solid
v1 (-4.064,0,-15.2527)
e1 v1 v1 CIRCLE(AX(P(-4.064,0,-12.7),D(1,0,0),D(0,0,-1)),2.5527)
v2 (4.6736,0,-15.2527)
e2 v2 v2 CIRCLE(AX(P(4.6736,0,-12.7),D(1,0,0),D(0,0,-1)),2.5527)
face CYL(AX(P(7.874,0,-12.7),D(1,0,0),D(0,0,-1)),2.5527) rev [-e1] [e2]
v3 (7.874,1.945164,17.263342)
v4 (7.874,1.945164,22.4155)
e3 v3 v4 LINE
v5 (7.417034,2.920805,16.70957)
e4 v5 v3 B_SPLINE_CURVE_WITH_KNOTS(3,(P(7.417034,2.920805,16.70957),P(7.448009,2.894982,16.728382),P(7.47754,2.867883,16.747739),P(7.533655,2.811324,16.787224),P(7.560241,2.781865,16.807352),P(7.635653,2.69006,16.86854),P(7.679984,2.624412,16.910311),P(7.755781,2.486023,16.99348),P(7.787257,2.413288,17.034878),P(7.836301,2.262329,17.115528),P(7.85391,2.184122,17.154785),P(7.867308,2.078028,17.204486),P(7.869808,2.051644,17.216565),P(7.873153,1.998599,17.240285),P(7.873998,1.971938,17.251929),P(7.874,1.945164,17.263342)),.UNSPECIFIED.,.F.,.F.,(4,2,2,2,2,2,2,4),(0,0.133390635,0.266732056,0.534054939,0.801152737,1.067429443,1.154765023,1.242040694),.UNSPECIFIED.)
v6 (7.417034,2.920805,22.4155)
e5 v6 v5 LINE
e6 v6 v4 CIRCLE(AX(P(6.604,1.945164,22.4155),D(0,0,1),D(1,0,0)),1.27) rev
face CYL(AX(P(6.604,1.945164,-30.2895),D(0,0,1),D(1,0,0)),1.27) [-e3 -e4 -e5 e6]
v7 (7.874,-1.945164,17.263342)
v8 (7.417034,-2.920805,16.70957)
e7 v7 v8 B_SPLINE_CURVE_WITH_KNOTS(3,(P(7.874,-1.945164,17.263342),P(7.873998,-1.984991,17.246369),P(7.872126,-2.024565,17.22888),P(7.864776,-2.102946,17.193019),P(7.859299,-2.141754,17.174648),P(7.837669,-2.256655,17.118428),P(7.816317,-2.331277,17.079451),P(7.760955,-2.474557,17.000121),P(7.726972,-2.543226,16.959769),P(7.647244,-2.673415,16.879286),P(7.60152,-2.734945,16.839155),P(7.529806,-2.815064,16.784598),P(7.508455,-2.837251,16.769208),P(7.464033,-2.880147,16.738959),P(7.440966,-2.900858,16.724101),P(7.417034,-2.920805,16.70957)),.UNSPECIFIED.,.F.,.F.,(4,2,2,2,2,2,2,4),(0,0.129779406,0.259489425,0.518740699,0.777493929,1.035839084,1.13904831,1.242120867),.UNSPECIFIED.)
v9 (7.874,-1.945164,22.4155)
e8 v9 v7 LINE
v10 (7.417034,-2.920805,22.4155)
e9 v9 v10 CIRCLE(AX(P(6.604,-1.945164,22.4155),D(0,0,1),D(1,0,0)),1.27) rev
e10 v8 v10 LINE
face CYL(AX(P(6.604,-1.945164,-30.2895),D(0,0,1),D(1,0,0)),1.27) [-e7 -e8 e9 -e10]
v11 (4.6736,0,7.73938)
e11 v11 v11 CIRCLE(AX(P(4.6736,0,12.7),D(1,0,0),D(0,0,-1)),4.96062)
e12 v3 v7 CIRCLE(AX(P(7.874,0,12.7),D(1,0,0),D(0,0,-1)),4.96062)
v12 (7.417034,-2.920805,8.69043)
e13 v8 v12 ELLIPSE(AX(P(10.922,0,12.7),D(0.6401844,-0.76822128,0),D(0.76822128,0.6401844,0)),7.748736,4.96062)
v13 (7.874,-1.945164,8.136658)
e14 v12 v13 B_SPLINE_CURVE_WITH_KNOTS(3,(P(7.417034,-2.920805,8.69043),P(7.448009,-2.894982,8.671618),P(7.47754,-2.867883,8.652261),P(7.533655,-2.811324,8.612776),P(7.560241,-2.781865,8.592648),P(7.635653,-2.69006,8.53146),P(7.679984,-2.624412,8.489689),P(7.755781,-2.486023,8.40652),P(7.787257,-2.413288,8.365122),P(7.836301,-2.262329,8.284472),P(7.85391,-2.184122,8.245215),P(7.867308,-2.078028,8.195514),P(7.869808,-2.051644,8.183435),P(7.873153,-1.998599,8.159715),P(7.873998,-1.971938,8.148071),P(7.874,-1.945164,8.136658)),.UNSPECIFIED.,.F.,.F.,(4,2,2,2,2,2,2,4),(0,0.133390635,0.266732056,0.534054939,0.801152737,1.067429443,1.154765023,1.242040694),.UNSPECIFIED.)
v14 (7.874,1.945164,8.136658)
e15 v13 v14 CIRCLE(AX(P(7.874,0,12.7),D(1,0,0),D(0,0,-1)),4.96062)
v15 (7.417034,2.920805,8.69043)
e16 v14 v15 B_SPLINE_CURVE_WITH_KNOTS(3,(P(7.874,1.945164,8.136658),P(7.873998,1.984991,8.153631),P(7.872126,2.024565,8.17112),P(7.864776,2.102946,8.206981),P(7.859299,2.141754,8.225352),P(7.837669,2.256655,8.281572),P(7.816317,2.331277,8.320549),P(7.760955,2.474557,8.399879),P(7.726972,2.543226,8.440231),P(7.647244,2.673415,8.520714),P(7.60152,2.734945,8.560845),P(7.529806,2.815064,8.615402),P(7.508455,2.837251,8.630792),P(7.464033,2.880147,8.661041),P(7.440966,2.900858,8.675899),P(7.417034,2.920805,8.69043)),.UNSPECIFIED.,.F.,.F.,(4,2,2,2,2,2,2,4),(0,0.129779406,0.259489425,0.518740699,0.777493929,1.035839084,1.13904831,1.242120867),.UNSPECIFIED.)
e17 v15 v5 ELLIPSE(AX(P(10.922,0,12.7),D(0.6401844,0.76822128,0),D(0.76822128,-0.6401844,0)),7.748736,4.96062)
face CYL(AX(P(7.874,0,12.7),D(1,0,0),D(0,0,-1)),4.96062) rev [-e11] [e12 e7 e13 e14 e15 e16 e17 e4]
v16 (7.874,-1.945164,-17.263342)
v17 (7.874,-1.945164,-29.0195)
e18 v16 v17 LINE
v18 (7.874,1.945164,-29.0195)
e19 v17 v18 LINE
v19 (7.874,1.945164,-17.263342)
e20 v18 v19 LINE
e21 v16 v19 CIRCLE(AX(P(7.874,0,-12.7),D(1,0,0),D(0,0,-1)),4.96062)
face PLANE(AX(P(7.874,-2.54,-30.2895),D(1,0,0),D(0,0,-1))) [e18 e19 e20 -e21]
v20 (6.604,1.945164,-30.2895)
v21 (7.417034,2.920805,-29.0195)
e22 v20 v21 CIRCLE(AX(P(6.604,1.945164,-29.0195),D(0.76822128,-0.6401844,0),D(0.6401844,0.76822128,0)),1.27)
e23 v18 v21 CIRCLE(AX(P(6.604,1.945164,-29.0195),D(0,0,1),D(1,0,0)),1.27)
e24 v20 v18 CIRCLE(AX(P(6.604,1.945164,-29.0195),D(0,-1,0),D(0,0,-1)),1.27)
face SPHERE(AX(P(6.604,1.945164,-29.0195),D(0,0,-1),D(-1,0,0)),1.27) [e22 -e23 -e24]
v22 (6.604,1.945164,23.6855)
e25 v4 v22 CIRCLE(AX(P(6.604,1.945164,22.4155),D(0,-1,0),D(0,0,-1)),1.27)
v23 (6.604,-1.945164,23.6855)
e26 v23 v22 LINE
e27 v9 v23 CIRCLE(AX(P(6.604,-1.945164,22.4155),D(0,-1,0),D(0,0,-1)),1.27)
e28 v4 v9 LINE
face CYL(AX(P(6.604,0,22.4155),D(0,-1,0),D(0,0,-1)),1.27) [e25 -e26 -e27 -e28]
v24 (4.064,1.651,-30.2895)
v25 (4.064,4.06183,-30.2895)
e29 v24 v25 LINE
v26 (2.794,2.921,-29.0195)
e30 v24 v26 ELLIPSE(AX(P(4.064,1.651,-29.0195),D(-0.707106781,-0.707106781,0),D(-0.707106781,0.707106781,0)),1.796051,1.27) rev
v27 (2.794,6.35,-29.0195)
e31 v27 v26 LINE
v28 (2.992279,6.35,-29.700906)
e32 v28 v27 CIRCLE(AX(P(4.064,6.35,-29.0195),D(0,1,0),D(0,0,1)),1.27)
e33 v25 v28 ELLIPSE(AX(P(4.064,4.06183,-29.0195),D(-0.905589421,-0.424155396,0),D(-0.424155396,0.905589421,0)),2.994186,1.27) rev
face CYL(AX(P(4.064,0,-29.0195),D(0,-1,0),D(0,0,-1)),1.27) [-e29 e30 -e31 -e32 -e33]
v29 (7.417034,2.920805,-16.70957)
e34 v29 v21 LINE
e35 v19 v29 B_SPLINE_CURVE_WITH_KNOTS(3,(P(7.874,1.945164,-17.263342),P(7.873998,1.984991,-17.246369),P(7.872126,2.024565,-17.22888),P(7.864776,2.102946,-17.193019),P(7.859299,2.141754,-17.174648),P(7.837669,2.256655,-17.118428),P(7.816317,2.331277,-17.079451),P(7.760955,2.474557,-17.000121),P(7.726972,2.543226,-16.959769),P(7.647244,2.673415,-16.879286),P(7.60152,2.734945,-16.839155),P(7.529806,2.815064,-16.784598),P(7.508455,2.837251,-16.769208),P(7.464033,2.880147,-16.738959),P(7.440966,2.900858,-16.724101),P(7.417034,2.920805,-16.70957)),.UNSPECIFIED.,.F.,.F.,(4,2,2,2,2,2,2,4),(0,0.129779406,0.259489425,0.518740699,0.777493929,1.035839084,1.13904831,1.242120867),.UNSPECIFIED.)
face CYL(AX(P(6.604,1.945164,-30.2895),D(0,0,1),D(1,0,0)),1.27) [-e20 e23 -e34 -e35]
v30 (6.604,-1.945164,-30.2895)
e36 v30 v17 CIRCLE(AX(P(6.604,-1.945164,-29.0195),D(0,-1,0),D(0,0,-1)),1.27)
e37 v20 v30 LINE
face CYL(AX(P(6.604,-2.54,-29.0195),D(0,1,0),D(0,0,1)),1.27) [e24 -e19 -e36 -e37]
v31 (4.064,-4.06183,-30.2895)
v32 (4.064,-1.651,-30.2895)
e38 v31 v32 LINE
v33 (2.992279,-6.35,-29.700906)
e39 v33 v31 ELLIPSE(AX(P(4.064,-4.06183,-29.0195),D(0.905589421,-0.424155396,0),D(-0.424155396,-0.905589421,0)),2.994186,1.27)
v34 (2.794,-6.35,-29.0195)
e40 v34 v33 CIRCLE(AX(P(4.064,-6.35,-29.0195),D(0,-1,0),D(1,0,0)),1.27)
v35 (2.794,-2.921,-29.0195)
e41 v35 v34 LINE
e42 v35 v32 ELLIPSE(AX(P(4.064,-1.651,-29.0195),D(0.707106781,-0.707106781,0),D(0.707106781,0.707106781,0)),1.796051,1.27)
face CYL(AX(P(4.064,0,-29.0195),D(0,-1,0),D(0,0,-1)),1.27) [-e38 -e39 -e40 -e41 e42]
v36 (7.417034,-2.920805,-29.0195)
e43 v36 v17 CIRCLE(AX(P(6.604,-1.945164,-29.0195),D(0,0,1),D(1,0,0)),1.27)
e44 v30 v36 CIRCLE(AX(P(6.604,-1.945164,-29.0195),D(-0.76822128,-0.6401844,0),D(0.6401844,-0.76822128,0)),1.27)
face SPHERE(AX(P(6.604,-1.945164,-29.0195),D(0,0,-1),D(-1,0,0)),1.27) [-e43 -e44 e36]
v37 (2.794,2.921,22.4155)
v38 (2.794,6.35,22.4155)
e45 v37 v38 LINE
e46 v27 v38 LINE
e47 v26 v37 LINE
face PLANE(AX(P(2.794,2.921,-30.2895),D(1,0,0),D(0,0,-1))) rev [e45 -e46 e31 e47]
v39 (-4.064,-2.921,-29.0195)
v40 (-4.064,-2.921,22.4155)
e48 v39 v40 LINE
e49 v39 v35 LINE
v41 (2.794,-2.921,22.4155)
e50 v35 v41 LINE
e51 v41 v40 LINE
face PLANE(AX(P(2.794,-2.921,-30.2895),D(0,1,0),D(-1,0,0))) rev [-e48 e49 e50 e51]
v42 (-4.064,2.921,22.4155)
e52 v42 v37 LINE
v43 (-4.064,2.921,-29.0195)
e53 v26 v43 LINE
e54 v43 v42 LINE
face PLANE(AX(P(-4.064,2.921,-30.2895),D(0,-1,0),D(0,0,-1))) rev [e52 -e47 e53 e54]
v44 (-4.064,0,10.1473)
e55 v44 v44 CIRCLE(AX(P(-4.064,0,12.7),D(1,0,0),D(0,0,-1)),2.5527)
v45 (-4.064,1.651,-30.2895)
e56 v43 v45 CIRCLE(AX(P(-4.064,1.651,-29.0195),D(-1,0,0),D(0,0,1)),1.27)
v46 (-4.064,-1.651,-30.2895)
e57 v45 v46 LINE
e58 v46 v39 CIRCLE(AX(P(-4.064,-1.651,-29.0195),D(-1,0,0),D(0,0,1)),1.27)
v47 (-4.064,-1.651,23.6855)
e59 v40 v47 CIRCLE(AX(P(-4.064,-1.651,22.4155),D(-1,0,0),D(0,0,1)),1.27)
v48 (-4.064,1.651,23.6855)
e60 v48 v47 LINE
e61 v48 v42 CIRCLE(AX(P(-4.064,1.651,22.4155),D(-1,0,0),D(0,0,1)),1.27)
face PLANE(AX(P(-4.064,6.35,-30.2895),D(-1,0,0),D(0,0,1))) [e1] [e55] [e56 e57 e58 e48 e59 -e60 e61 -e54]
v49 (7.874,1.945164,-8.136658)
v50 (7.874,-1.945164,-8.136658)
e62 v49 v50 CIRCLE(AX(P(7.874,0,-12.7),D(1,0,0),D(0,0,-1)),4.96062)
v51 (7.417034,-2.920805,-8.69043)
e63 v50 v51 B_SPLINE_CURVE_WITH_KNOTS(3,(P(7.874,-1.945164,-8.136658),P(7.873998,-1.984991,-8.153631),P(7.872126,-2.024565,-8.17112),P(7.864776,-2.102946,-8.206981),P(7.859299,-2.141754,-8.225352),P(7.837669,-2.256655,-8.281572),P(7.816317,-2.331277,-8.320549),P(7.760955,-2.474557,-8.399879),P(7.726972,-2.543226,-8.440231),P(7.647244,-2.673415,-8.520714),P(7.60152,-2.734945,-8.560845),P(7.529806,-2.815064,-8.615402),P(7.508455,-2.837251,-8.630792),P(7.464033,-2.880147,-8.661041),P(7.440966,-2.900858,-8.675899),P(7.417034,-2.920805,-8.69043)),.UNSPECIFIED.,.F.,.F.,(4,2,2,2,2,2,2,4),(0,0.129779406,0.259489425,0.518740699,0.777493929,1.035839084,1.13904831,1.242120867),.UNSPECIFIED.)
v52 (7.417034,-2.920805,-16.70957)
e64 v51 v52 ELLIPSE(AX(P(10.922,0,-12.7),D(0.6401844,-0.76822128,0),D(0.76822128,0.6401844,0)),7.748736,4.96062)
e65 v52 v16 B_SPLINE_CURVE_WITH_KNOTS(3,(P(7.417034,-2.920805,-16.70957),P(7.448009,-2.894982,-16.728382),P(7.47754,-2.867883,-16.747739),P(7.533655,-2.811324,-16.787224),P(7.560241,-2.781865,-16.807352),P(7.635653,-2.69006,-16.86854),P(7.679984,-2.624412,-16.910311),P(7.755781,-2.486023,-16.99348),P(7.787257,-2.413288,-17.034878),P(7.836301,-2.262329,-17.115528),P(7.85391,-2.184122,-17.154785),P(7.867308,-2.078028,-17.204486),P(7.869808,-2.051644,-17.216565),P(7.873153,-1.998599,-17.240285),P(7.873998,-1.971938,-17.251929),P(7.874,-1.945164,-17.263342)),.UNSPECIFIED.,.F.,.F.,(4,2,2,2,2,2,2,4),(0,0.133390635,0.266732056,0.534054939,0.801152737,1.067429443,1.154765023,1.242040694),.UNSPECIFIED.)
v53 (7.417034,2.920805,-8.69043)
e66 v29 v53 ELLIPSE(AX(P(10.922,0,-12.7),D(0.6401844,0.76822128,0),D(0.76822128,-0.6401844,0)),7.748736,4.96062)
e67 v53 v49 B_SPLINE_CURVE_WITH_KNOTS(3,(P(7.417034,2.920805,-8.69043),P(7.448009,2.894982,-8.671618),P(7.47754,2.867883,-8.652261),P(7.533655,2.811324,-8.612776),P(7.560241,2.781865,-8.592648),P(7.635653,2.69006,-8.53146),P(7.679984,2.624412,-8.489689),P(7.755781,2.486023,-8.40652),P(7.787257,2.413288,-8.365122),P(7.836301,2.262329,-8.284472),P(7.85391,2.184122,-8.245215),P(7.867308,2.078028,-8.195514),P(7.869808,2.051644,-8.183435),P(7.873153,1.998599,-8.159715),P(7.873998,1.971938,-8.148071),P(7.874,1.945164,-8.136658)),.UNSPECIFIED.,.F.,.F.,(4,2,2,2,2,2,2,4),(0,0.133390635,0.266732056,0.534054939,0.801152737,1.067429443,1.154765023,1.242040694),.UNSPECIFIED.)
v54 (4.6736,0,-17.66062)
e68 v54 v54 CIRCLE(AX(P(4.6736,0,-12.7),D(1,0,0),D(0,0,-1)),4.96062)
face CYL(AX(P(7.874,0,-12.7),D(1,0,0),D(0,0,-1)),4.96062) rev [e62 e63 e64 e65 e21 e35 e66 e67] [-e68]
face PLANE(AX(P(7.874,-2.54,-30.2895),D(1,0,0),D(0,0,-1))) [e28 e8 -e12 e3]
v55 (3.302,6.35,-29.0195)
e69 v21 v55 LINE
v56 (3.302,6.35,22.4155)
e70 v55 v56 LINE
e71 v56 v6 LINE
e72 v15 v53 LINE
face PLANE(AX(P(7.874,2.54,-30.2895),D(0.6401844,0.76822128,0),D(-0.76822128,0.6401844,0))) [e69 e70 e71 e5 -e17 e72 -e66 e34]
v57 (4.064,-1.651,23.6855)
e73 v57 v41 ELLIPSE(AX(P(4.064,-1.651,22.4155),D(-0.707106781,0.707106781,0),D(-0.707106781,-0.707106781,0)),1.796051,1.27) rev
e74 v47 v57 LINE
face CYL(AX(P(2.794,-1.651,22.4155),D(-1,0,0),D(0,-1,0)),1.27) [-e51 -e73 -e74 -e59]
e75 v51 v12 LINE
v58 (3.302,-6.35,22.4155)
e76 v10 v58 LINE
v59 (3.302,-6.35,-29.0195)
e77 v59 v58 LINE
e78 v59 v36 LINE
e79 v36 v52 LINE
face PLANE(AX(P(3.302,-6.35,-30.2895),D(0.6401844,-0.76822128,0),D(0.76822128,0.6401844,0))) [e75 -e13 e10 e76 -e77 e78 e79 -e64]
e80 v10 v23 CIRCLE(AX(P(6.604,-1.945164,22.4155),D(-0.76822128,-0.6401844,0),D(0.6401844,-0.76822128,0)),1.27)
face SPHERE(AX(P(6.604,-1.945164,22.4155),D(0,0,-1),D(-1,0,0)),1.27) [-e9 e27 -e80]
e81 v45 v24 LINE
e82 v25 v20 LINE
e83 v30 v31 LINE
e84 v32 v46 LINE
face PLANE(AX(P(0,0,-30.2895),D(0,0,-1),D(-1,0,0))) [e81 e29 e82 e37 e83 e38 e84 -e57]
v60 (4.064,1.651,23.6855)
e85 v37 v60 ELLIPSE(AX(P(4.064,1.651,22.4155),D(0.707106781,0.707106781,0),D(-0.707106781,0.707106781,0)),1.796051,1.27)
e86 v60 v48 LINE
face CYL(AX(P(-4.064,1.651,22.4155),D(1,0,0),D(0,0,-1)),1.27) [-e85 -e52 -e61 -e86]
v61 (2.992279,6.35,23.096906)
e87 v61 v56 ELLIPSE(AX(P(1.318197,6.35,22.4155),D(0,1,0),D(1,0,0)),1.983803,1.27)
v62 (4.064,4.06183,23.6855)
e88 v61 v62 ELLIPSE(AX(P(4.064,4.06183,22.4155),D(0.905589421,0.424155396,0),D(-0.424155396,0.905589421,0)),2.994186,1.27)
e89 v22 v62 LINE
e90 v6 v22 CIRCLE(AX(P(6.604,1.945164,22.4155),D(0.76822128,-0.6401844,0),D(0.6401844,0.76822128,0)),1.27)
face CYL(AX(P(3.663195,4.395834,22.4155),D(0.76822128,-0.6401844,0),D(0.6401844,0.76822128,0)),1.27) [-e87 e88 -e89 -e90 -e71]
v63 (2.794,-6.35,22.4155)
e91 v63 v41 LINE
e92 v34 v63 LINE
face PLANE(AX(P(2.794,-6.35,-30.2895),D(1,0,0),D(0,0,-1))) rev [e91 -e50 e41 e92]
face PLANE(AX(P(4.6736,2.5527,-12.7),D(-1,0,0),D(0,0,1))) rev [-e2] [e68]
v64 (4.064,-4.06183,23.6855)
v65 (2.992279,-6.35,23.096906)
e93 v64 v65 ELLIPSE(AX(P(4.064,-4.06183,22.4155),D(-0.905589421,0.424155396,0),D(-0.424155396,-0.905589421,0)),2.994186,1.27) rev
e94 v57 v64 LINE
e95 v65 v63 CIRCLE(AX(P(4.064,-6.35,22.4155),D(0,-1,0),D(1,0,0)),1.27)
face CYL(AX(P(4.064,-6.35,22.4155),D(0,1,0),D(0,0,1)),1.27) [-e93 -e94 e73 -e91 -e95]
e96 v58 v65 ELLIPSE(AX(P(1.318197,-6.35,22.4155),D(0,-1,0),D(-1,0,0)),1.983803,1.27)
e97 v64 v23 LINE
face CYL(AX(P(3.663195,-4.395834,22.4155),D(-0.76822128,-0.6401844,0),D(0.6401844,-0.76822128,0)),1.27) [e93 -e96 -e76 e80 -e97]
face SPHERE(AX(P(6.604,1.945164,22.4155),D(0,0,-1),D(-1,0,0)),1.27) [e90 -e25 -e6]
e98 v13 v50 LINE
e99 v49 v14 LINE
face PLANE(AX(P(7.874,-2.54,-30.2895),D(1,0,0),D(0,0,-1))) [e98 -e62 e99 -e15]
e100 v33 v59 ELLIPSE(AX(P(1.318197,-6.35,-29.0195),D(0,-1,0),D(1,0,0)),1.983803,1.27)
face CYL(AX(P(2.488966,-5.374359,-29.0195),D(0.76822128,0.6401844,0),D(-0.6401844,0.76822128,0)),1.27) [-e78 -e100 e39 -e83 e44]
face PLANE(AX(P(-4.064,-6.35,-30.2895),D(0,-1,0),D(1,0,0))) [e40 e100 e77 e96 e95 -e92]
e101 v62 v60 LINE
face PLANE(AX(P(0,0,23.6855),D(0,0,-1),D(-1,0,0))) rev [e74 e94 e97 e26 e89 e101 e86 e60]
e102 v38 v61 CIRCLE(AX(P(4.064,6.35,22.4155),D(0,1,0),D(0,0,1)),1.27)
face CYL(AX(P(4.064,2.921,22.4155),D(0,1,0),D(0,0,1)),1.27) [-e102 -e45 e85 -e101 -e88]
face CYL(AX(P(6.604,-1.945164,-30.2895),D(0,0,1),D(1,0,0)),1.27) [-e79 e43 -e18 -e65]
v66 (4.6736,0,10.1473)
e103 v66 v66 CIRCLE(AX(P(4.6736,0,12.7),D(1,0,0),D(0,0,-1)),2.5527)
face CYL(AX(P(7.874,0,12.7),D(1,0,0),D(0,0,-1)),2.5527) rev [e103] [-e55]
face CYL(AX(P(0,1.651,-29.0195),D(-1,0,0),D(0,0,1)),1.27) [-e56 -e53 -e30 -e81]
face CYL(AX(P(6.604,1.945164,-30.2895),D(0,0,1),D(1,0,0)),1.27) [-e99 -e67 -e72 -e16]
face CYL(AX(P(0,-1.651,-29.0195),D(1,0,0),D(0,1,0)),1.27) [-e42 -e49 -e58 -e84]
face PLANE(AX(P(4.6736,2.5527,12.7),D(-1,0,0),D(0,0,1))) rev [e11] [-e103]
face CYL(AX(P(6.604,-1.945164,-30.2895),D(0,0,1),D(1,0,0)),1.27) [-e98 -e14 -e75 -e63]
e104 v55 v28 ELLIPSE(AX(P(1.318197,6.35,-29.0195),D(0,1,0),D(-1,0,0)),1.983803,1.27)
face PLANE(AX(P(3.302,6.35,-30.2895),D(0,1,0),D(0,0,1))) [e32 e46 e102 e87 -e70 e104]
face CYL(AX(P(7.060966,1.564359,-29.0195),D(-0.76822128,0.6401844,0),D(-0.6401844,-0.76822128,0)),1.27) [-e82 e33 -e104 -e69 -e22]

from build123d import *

# Parameters (mm, degrees)
BOSS_EXTRUDE1_DEPTH                             = 53.975
SKETCH2_W                                       = 6.858
SKETCH2_H                                       = 3.429
CUT_EXTRUDE1_DEPTH                              = 55.91468839
SKETCH4_W                                       = 6.858
SKETCH4_H                                       = 3.429
CUT_EXTRUDE2_DEPTH                              = 55.91468839
F_3_CLEARANCE_HOLE1_D                           = 2.7686
CBORE_FOR_10_BUTTON_HEAD_CAP_SCREW1_D           = 5.1054
CBORE_FOR_10_BUTTON_HEAD_CAP_SCREW1_CBORE_D     = 9.92124
CBORE_FOR_10_BUTTON_HEAD_CAP_SCREW1_CBORE_DEPTH = 3.2004
FILLET1_R                                       = 1.27
FILLET3_R                                       = 1.27
FILLET5_R                                       = 1.27


with BuildPart() as part:
    # Sketch1 → Boss-Extrude1 (new body)
    with BuildSketch(Plane.XY.offset(23.6855)):
        Polygon((3.302, 6.35), (-4.064, 6.35), (-4.064, -6.35), (3.302, -6.35), (7.874, -2.54), (7.874, 2.54), align=None)
    extrude(amount=-BOSS_EXTRUDE1_DEPTH)

    # Sketch2 → Cut-Extrude1 (cut, through all)
    with BuildSketch(Plane.XY.offset(23.6855)):
        with Locations((-0.635, 4.6355)):
            Rectangle(SKETCH2_W, SKETCH2_H)
    extrude(amount=-CUT_EXTRUDE1_DEPTH, mode=Mode.SUBTRACT)

    # Sketch4 → Cut-Extrude2 (cut, through all)
    with BuildSketch(Plane.XY.offset(23.6855)):
        with Locations((-0.635, -4.6355)):
            Rectangle(SKETCH4_W, SKETCH4_H)
    extrude(amount=-CUT_EXTRUDE2_DEPTH, mode=Mode.SUBTRACT)

    # #3 Clearance Hole1 (through all)
    with Locations(Plane.ZY.offset(4.064)):
        with Locations((12.7, 0), (-12.7, 0)):
            Hole(F_3_CLEARANCE_HOLE1_D / 2)

    # CBORE for #10 Button Head Cap Screw1 (through all)
    with Locations(Plane(origin=(7.874, 0, 0), x_dir=(0, 0, -1), z_dir=(1, 0, 0))):
        with Locations((-12.7, 0), (12.7, 0)):
            CounterBoreHole(CBORE_FOR_10_BUTTON_HEAD_CAP_SCREW1_D / 2, CBORE_FOR_10_BUTTON_HEAD_CAP_SCREW1_CBORE_D / 2, CBORE_FOR_10_BUTTON_HEAD_CAP_SCREW1_CBORE_DEPTH)

    # Fillet1
    fillet1_edges = [part.edges().sort_by_distance(p)[0] for p in [
        (7.874, -2.54, 20.323251747),
        (7.874, -2.54, -23.625251747),
        (7.874, -2.54, 0),
        (7.874, 2.54, 20.323251747),
        (7.874, 2.54, 0),
        (7.874, 2.54, -23.625251747),
    ]]
    fillet(fillet1_edges, radius=FILLET1_R)

    # Fillet3
    # the kernel refuses this fillet: 1.27 mm, written as the material it takes off along each edge
    with BuildSketch(Plane(origin=(0.862897437, -8.382585469, -30.2895), x_dir=(0, 0, 1), z_dir=(0.7682212795973759, 0.6401843996644799, 0)), Plane(origin=(7.417034188, 2.920804844, -30.2895), x_dir=(0, 0, 1), z_dir=(-0.7682212795973759, 0.6401843996644799, 0))) as fillet3_piece_1:
        with BuildLine():
            CenterArc((FILLET3_R, -FILLET3_R), FILLET3_R, 90, 90)
            Line((0, -FILLET3_R), (0, 0))
            Line((0, 0), (FILLET3_R, 0))
        make_face()
    extrude(amount=8.531574072, mode=Mode.SUBTRACT)
    with BuildSketch(Plane(origin=(6.604, -1.945163819, -30.2895), x_dir=(0.6401843996644796, -0.7682212795973762, 0), z_dir=(-0.7682212795973762, -0.6401843996644796, 0))) as fillet3_piece_2:
        with BuildLine():
            CenterArc((1.27 - FILLET3_R, FILLET3_R), FILLET3_R, 270, 90)
            Line((1.27, FILLET3_R), (1.27, 0))
            Line((1.27, 0), (1.27 - FILLET3_R, 0))
        make_face()
    revolve(axis=Axis((6.604, -1.945163819, -30.2895), (0, 0, 1)), revolution_arc=50.194428908, mode=Mode.SUBTRACT)
    with BuildSketch(Plane(origin=(6.604, 1.945163819, -30.2895), x_dir=(0.6401843996644799, 0.7682212795973757, 0), z_dir=(-0.7682212795973757, 0.6401843996644799, 0))) as fillet3_piece_3:
        with BuildLine():
            CenterArc((1.27 - FILLET3_R, -FILLET3_R), FILLET3_R, 0, 90)
            Line((1.27, -FILLET3_R), (1.27, 0))
            Line((1.27, 0), (1.27 - FILLET3_R, 0))
        make_face()
    revolve(axis=Axis((6.604, 1.945163819, -30.2895), (0, 0, -1)), revolution_arc=50.194428908, mode=Mode.SUBTRACT)
    with BuildSketch(Plane(origin=(2.794, -2.921, -30.2895), x_dir=(0, 0, 1), z_dir=(-1, 0, 0)), Plane(origin=(-7.239, 2.921, -30.2895), x_dir=(0, 0, 1), z_dir=(1, 0, 0))) as fillet3_piece_4:
        with BuildLine():
            CenterArc((FILLET3_R, FILLET3_R), FILLET3_R, 180, 90)
            Line((0, FILLET3_R), (0, 0))
            Line((0, 0), (FILLET3_R, 0))
        make_face()
    extrude(amount=10.033, mode=Mode.SUBTRACT)
    with BuildSketch(Plane(origin=(2.794, 2.921, -30.2895), x_dir=(0, 0, 1), z_dir=(0, 1, 0)), Plane(origin=(2.794, -9.525, -30.2895), x_dir=(0, 0, 1), z_dir=(0, 1, 0))) as fillet3_piece_5:
        with BuildLine():
            CenterArc((FILLET3_R, FILLET3_R), FILLET3_R, 180, 90)
            Line((0, FILLET3_R), (0, 0))
            Line((0, 0), (FILLET3_R, 0))
        make_face()
    extrude(amount=6.604, mode=Mode.SUBTRACT)
    with BuildSketch(Plane(origin=(7.874, -1.945163819, -30.2895), x_dir=(-1, 0, 0), z_dir=(0, 1, 0))) as fillet3_piece_6:
        with BuildLine():
            CenterArc((FILLET3_R, FILLET3_R), FILLET3_R, 180, 90)
            Line((0, FILLET3_R), (0, 0))
            Line((0, 0), (FILLET3_R, 0))
        make_face()
    extrude(amount=3.890327637, mode=Mode.SUBTRACT)
    with BuildSketch(Plane(origin=(2.794, -9.525, -30.2895), x_dir=(0, 0, 1), z_dir=(0, 1, 0))) as fillet3_piece_7a_section:
        with BuildLine():
            CenterArc((FILLET3_R, FILLET3_R), FILLET3_R, 180, 90)
            Line((0, FILLET3_R), (0, 0))
            Line((0, 0), (FILLET3_R, 0))
        make_face()
    fillet3_piece_7a = extrude(amount=9.779, mode=Mode.PRIVATE)
    fillet3_piece_7a = split(fillet3_piece_7a, bisect_by=Plane(origin=(3.081521795, -2.921, -30.001978205), z_dir=(0, 1, 0)), keep=Keep.TOP, mode=Mode.PRIVATE)
    with BuildSketch(Plane(origin=(5.969, -2.921, -30.2895), x_dir=(0, 0, 1), z_dir=(-1, 0, 0))) as fillet3_piece_7b_section:
        with BuildLine():
            CenterArc((FILLET3_R, FILLET3_R), FILLET3_R, 180, 90)
            Line((0, FILLET3_R), (0, 0))
            Line((0, 0), (FILLET3_R, 0))
        make_face()
    fillet3_piece_7b = extrude(amount=13.208, mode=Mode.PRIVATE)
    fillet3_piece_7b = split(fillet3_piece_7b, bisect_by=Plane(origin=(2.794, -2.633478205, -30.001978205), z_dir=(1, 0, 0)), keep=Keep.TOP, mode=Mode.PRIVATE)
    fillet3_piece_7 = fillet3_piece_7a & fillet3_piece_7b
    add(fillet3_piece_7, mode=Mode.SUBTRACT)
    with BuildSketch(Plane(origin=(2.794, -0.254, -30.2895), x_dir=(0, 0, 1), z_dir=(0, 1, 0))) as fillet3_piece_8a_section:
        with BuildLine():
            CenterArc((FILLET3_R, FILLET3_R), FILLET3_R, 180, 90)
            Line((0, FILLET3_R), (0, 0))
            Line((0, 0), (FILLET3_R, 0))
        make_face()
    fillet3_piece_8a = extrude(amount=9.779, mode=Mode.PRIVATE)
    fillet3_piece_8a = split(fillet3_piece_8a, bisect_by=Plane(origin=(3.081521795, 2.921, -30.001978205), z_dir=(0, -1, 0)), keep=Keep.TOP, mode=Mode.PRIVATE)
    with BuildSketch(Plane(origin=(-7.239, 2.921, -30.2895), x_dir=(0, 0, 1), z_dir=(1, 0, 0))) as fillet3_piece_8b_section:
        with BuildLine():
            CenterArc((FILLET3_R, FILLET3_R), FILLET3_R, 180, 90)
            Line((0, FILLET3_R), (0, 0))
            Line((0, 0), (FILLET3_R, 0))
        make_face()
    fillet3_piece_8b = extrude(amount=13.208, mode=Mode.PRIVATE)
    fillet3_piece_8b = split(fillet3_piece_8b, bisect_by=Plane(origin=(2.794, 2.633478205, -30.001978205), z_dir=(1, 0, 0)), keep=Keep.TOP, mode=Mode.PRIVATE)
    fillet3_piece_8 = fillet3_piece_8a & fillet3_piece_8b
    add(fillet3_piece_8, mode=Mode.SUBTRACT)

    # Fillet5
    # the kernel refuses this fillet: 1.27 mm, written as the material it takes off along each edge
    with BuildSketch(Plane(origin=(0.862897437, -8.382585469, 23.6855), x_dir=(-0.6401843996644799, 0.7682212795973759, 0), z_dir=(0.7682212795973759, 0.6401843996644799, 0)), Plane(origin=(7.417034188, 2.920804844, 23.6855), x_dir=(-0.6401843996644799, -0.7682212795973759, 0), z_dir=(-0.7682212795973759, 0.6401843996644799, 0))) as fillet5_piece_1:
        with BuildLine():
            CenterArc((FILLET5_R, -FILLET5_R), FILLET5_R, 90, 90)
            Line((0, -FILLET5_R), (0, 0))
            Line((0, 0), (FILLET5_R, 0))
        make_face()
    extrude(amount=8.531574072, mode=Mode.SUBTRACT)
    with BuildSketch(Plane(origin=(6.604, -1.945163819, 23.6855), x_dir=(1, 0, 0), z_dir=(0, 1, 0))) as fillet5_piece_2:
        with BuildLine():
            CenterArc((1.27 - FILLET5_R, FILLET5_R), FILLET5_R, 270, 90)
            Line((1.27, FILLET5_R), (1.27, 0))
            Line((1.27, 0), (1.27 - FILLET5_R, 0))
        make_face()
    revolve(axis=Axis((6.604, -1.945163819, 23.6855), (0, 0, -1)), revolution_arc=50.194428908, mode=Mode.SUBTRACT)
    with BuildSketch(Plane(origin=(6.604, 1.945163819, 23.6855), x_dir=(0.6401843996644799, 0.7682212795973757, 0), z_dir=(-0.7682212795973757, 0.6401843996644799, 0))) as fillet5_piece_3:
        with BuildLine():
            CenterArc((1.27 - FILLET5_R, FILLET5_R), FILLET5_R, 270, 90)
            Line((1.27, FILLET5_R), (1.27, 0))
            Line((1.27, 0), (1.27 - FILLET5_R, 0))
        make_face()
    revolve(axis=Axis((6.604, 1.945163819, 23.6855), (0, 0, -1)), revolution_arc=50.194428908, mode=Mode.SUBTRACT)
    with BuildSketch(Plane(origin=(2.794, 2.921, 23.6855), x_dir=(1, 0, 0), z_dir=(0, 1, 0)), Plane(origin=(2.794, -9.525, 23.6855), x_dir=(1, 0, 0), z_dir=(0, 1, 0))) as fillet5_piece_4:
        with BuildLine():
            CenterArc((FILLET5_R, FILLET5_R), FILLET5_R, 180, 90)
            Line((0, FILLET5_R), (0, 0))
            Line((0, 0), (FILLET5_R, 0))
        make_face()
    extrude(amount=6.604, mode=Mode.SUBTRACT)
    with BuildSketch(Plane(origin=(-7.239, 2.921, 23.6855), x_dir=(0, -1, 0), z_dir=(1, 0, 0)), Plane(origin=(2.794, -2.921, 23.6855), x_dir=(0, 1, 0), z_dir=(-1, 0, 0))) as fillet5_piece_5:
        with BuildLine():
            CenterArc((FILLET5_R, FILLET5_R), FILLET5_R, 180, 90)
            Line((0, FILLET5_R), (0, 0))
            Line((0, 0), (FILLET5_R, 0))
        make_face()
    extrude(amount=10.033, mode=Mode.SUBTRACT)
    with BuildSketch(Plane(origin=(7.874, -1.945163819, 23.6855), x_dir=(-1, 0, 0), z_dir=(0, 1, 0))) as fillet5_piece_6:
        with BuildLine():
            CenterArc((FILLET5_R, -FILLET5_R), FILLET5_R, 90, 90)
            Line((0, -FILLET5_R), (0, 0))
            Line((0, 0), (FILLET5_R, 0))
        make_face()
    extrude(amount=3.890327637, mode=Mode.SUBTRACT)
    with BuildSketch(Plane(origin=(2.794, -0.254, 23.6855), x_dir=(1, 0, 0), z_dir=(0, 1, 0))) as fillet5_piece_7a_section:
        with BuildLine():
            CenterArc((FILLET5_R, FILLET5_R), FILLET5_R, 180, 90)
            Line((0, FILLET5_R), (0, 0))
            Line((0, 0), (FILLET5_R, 0))
        make_face()
    fillet5_piece_7a = extrude(amount=9.779, mode=Mode.PRIVATE)
    fillet5_piece_7a = split(fillet5_piece_7a, bisect_by=Plane(origin=(3.081521795, 2.921, 23.397978205), z_dir=(0, -1, 0)), keep=Keep.TOP, mode=Mode.PRIVATE)
    with BuildSketch(Plane(origin=(-7.239, 2.921, 23.6855), x_dir=(0, -1, 0), z_dir=(1, 0, 0))) as fillet5_piece_7b_section:
        with BuildLine():
            CenterArc((FILLET5_R, FILLET5_R), FILLET5_R, 180, 90)
            Line((0, FILLET5_R), (0, 0))
            Line((0, 0), (FILLET5_R, 0))
        make_face()
    fillet5_piece_7b = extrude(amount=13.208, mode=Mode.PRIVATE)
    fillet5_piece_7b = split(fillet5_piece_7b, bisect_by=Plane(origin=(2.794, 2.633478205, 23.397978205), z_dir=(1, 0, 0)), keep=Keep.TOP, mode=Mode.PRIVATE)
    fillet5_piece_7 = fillet5_piece_7a & fillet5_piece_7b
    add(fillet5_piece_7, mode=Mode.SUBTRACT)
    with BuildSketch(Plane(origin=(2.794, -9.525, 23.6855), x_dir=(1, 0, 0), z_dir=(0, 1, 0))) as fillet5_piece_8a_section:
        with BuildLine():
            CenterArc((FILLET5_R, FILLET5_R), FILLET5_R, 180, 90)
            Line((0, FILLET5_R), (0, 0))
            Line((0, 0), (FILLET5_R, 0))
        make_face()
    fillet5_piece_8a = extrude(amount=9.779, mode=Mode.PRIVATE)
    fillet5_piece_8a = split(fillet5_piece_8a, bisect_by=Plane(origin=(3.081521795, -2.921, 23.397978205), z_dir=(0, 1, 0)), keep=Keep.TOP, mode=Mode.PRIVATE)
    with BuildSketch(Plane(origin=(5.969, -2.921, 23.6855), x_dir=(0, 1, 0), z_dir=(-1, 0, 0))) as fillet5_piece_8b_section:
        with BuildLine():
            CenterArc((FILLET5_R, FILLET5_R), FILLET5_R, 180, 90)
            Line((0, FILLET5_R), (0, 0))
            Line((0, 0), (FILLET5_R, 0))
        make_face()
    fillet5_piece_8b = extrude(amount=13.208, mode=Mode.PRIVATE)
    fillet5_piece_8b = split(fillet5_piece_8b, bisect_by=Plane(origin=(2.794, -2.633478205, 23.397978205), z_dir=(1, 0, 0)), keep=Keep.TOP, mode=Mode.PRIVATE)
    fillet5_piece_8 = fillet5_piece_8a & fillet5_piece_8b
    add(fillet5_piece_8, mode=Mode.SUBTRACT)


solid = part.part
